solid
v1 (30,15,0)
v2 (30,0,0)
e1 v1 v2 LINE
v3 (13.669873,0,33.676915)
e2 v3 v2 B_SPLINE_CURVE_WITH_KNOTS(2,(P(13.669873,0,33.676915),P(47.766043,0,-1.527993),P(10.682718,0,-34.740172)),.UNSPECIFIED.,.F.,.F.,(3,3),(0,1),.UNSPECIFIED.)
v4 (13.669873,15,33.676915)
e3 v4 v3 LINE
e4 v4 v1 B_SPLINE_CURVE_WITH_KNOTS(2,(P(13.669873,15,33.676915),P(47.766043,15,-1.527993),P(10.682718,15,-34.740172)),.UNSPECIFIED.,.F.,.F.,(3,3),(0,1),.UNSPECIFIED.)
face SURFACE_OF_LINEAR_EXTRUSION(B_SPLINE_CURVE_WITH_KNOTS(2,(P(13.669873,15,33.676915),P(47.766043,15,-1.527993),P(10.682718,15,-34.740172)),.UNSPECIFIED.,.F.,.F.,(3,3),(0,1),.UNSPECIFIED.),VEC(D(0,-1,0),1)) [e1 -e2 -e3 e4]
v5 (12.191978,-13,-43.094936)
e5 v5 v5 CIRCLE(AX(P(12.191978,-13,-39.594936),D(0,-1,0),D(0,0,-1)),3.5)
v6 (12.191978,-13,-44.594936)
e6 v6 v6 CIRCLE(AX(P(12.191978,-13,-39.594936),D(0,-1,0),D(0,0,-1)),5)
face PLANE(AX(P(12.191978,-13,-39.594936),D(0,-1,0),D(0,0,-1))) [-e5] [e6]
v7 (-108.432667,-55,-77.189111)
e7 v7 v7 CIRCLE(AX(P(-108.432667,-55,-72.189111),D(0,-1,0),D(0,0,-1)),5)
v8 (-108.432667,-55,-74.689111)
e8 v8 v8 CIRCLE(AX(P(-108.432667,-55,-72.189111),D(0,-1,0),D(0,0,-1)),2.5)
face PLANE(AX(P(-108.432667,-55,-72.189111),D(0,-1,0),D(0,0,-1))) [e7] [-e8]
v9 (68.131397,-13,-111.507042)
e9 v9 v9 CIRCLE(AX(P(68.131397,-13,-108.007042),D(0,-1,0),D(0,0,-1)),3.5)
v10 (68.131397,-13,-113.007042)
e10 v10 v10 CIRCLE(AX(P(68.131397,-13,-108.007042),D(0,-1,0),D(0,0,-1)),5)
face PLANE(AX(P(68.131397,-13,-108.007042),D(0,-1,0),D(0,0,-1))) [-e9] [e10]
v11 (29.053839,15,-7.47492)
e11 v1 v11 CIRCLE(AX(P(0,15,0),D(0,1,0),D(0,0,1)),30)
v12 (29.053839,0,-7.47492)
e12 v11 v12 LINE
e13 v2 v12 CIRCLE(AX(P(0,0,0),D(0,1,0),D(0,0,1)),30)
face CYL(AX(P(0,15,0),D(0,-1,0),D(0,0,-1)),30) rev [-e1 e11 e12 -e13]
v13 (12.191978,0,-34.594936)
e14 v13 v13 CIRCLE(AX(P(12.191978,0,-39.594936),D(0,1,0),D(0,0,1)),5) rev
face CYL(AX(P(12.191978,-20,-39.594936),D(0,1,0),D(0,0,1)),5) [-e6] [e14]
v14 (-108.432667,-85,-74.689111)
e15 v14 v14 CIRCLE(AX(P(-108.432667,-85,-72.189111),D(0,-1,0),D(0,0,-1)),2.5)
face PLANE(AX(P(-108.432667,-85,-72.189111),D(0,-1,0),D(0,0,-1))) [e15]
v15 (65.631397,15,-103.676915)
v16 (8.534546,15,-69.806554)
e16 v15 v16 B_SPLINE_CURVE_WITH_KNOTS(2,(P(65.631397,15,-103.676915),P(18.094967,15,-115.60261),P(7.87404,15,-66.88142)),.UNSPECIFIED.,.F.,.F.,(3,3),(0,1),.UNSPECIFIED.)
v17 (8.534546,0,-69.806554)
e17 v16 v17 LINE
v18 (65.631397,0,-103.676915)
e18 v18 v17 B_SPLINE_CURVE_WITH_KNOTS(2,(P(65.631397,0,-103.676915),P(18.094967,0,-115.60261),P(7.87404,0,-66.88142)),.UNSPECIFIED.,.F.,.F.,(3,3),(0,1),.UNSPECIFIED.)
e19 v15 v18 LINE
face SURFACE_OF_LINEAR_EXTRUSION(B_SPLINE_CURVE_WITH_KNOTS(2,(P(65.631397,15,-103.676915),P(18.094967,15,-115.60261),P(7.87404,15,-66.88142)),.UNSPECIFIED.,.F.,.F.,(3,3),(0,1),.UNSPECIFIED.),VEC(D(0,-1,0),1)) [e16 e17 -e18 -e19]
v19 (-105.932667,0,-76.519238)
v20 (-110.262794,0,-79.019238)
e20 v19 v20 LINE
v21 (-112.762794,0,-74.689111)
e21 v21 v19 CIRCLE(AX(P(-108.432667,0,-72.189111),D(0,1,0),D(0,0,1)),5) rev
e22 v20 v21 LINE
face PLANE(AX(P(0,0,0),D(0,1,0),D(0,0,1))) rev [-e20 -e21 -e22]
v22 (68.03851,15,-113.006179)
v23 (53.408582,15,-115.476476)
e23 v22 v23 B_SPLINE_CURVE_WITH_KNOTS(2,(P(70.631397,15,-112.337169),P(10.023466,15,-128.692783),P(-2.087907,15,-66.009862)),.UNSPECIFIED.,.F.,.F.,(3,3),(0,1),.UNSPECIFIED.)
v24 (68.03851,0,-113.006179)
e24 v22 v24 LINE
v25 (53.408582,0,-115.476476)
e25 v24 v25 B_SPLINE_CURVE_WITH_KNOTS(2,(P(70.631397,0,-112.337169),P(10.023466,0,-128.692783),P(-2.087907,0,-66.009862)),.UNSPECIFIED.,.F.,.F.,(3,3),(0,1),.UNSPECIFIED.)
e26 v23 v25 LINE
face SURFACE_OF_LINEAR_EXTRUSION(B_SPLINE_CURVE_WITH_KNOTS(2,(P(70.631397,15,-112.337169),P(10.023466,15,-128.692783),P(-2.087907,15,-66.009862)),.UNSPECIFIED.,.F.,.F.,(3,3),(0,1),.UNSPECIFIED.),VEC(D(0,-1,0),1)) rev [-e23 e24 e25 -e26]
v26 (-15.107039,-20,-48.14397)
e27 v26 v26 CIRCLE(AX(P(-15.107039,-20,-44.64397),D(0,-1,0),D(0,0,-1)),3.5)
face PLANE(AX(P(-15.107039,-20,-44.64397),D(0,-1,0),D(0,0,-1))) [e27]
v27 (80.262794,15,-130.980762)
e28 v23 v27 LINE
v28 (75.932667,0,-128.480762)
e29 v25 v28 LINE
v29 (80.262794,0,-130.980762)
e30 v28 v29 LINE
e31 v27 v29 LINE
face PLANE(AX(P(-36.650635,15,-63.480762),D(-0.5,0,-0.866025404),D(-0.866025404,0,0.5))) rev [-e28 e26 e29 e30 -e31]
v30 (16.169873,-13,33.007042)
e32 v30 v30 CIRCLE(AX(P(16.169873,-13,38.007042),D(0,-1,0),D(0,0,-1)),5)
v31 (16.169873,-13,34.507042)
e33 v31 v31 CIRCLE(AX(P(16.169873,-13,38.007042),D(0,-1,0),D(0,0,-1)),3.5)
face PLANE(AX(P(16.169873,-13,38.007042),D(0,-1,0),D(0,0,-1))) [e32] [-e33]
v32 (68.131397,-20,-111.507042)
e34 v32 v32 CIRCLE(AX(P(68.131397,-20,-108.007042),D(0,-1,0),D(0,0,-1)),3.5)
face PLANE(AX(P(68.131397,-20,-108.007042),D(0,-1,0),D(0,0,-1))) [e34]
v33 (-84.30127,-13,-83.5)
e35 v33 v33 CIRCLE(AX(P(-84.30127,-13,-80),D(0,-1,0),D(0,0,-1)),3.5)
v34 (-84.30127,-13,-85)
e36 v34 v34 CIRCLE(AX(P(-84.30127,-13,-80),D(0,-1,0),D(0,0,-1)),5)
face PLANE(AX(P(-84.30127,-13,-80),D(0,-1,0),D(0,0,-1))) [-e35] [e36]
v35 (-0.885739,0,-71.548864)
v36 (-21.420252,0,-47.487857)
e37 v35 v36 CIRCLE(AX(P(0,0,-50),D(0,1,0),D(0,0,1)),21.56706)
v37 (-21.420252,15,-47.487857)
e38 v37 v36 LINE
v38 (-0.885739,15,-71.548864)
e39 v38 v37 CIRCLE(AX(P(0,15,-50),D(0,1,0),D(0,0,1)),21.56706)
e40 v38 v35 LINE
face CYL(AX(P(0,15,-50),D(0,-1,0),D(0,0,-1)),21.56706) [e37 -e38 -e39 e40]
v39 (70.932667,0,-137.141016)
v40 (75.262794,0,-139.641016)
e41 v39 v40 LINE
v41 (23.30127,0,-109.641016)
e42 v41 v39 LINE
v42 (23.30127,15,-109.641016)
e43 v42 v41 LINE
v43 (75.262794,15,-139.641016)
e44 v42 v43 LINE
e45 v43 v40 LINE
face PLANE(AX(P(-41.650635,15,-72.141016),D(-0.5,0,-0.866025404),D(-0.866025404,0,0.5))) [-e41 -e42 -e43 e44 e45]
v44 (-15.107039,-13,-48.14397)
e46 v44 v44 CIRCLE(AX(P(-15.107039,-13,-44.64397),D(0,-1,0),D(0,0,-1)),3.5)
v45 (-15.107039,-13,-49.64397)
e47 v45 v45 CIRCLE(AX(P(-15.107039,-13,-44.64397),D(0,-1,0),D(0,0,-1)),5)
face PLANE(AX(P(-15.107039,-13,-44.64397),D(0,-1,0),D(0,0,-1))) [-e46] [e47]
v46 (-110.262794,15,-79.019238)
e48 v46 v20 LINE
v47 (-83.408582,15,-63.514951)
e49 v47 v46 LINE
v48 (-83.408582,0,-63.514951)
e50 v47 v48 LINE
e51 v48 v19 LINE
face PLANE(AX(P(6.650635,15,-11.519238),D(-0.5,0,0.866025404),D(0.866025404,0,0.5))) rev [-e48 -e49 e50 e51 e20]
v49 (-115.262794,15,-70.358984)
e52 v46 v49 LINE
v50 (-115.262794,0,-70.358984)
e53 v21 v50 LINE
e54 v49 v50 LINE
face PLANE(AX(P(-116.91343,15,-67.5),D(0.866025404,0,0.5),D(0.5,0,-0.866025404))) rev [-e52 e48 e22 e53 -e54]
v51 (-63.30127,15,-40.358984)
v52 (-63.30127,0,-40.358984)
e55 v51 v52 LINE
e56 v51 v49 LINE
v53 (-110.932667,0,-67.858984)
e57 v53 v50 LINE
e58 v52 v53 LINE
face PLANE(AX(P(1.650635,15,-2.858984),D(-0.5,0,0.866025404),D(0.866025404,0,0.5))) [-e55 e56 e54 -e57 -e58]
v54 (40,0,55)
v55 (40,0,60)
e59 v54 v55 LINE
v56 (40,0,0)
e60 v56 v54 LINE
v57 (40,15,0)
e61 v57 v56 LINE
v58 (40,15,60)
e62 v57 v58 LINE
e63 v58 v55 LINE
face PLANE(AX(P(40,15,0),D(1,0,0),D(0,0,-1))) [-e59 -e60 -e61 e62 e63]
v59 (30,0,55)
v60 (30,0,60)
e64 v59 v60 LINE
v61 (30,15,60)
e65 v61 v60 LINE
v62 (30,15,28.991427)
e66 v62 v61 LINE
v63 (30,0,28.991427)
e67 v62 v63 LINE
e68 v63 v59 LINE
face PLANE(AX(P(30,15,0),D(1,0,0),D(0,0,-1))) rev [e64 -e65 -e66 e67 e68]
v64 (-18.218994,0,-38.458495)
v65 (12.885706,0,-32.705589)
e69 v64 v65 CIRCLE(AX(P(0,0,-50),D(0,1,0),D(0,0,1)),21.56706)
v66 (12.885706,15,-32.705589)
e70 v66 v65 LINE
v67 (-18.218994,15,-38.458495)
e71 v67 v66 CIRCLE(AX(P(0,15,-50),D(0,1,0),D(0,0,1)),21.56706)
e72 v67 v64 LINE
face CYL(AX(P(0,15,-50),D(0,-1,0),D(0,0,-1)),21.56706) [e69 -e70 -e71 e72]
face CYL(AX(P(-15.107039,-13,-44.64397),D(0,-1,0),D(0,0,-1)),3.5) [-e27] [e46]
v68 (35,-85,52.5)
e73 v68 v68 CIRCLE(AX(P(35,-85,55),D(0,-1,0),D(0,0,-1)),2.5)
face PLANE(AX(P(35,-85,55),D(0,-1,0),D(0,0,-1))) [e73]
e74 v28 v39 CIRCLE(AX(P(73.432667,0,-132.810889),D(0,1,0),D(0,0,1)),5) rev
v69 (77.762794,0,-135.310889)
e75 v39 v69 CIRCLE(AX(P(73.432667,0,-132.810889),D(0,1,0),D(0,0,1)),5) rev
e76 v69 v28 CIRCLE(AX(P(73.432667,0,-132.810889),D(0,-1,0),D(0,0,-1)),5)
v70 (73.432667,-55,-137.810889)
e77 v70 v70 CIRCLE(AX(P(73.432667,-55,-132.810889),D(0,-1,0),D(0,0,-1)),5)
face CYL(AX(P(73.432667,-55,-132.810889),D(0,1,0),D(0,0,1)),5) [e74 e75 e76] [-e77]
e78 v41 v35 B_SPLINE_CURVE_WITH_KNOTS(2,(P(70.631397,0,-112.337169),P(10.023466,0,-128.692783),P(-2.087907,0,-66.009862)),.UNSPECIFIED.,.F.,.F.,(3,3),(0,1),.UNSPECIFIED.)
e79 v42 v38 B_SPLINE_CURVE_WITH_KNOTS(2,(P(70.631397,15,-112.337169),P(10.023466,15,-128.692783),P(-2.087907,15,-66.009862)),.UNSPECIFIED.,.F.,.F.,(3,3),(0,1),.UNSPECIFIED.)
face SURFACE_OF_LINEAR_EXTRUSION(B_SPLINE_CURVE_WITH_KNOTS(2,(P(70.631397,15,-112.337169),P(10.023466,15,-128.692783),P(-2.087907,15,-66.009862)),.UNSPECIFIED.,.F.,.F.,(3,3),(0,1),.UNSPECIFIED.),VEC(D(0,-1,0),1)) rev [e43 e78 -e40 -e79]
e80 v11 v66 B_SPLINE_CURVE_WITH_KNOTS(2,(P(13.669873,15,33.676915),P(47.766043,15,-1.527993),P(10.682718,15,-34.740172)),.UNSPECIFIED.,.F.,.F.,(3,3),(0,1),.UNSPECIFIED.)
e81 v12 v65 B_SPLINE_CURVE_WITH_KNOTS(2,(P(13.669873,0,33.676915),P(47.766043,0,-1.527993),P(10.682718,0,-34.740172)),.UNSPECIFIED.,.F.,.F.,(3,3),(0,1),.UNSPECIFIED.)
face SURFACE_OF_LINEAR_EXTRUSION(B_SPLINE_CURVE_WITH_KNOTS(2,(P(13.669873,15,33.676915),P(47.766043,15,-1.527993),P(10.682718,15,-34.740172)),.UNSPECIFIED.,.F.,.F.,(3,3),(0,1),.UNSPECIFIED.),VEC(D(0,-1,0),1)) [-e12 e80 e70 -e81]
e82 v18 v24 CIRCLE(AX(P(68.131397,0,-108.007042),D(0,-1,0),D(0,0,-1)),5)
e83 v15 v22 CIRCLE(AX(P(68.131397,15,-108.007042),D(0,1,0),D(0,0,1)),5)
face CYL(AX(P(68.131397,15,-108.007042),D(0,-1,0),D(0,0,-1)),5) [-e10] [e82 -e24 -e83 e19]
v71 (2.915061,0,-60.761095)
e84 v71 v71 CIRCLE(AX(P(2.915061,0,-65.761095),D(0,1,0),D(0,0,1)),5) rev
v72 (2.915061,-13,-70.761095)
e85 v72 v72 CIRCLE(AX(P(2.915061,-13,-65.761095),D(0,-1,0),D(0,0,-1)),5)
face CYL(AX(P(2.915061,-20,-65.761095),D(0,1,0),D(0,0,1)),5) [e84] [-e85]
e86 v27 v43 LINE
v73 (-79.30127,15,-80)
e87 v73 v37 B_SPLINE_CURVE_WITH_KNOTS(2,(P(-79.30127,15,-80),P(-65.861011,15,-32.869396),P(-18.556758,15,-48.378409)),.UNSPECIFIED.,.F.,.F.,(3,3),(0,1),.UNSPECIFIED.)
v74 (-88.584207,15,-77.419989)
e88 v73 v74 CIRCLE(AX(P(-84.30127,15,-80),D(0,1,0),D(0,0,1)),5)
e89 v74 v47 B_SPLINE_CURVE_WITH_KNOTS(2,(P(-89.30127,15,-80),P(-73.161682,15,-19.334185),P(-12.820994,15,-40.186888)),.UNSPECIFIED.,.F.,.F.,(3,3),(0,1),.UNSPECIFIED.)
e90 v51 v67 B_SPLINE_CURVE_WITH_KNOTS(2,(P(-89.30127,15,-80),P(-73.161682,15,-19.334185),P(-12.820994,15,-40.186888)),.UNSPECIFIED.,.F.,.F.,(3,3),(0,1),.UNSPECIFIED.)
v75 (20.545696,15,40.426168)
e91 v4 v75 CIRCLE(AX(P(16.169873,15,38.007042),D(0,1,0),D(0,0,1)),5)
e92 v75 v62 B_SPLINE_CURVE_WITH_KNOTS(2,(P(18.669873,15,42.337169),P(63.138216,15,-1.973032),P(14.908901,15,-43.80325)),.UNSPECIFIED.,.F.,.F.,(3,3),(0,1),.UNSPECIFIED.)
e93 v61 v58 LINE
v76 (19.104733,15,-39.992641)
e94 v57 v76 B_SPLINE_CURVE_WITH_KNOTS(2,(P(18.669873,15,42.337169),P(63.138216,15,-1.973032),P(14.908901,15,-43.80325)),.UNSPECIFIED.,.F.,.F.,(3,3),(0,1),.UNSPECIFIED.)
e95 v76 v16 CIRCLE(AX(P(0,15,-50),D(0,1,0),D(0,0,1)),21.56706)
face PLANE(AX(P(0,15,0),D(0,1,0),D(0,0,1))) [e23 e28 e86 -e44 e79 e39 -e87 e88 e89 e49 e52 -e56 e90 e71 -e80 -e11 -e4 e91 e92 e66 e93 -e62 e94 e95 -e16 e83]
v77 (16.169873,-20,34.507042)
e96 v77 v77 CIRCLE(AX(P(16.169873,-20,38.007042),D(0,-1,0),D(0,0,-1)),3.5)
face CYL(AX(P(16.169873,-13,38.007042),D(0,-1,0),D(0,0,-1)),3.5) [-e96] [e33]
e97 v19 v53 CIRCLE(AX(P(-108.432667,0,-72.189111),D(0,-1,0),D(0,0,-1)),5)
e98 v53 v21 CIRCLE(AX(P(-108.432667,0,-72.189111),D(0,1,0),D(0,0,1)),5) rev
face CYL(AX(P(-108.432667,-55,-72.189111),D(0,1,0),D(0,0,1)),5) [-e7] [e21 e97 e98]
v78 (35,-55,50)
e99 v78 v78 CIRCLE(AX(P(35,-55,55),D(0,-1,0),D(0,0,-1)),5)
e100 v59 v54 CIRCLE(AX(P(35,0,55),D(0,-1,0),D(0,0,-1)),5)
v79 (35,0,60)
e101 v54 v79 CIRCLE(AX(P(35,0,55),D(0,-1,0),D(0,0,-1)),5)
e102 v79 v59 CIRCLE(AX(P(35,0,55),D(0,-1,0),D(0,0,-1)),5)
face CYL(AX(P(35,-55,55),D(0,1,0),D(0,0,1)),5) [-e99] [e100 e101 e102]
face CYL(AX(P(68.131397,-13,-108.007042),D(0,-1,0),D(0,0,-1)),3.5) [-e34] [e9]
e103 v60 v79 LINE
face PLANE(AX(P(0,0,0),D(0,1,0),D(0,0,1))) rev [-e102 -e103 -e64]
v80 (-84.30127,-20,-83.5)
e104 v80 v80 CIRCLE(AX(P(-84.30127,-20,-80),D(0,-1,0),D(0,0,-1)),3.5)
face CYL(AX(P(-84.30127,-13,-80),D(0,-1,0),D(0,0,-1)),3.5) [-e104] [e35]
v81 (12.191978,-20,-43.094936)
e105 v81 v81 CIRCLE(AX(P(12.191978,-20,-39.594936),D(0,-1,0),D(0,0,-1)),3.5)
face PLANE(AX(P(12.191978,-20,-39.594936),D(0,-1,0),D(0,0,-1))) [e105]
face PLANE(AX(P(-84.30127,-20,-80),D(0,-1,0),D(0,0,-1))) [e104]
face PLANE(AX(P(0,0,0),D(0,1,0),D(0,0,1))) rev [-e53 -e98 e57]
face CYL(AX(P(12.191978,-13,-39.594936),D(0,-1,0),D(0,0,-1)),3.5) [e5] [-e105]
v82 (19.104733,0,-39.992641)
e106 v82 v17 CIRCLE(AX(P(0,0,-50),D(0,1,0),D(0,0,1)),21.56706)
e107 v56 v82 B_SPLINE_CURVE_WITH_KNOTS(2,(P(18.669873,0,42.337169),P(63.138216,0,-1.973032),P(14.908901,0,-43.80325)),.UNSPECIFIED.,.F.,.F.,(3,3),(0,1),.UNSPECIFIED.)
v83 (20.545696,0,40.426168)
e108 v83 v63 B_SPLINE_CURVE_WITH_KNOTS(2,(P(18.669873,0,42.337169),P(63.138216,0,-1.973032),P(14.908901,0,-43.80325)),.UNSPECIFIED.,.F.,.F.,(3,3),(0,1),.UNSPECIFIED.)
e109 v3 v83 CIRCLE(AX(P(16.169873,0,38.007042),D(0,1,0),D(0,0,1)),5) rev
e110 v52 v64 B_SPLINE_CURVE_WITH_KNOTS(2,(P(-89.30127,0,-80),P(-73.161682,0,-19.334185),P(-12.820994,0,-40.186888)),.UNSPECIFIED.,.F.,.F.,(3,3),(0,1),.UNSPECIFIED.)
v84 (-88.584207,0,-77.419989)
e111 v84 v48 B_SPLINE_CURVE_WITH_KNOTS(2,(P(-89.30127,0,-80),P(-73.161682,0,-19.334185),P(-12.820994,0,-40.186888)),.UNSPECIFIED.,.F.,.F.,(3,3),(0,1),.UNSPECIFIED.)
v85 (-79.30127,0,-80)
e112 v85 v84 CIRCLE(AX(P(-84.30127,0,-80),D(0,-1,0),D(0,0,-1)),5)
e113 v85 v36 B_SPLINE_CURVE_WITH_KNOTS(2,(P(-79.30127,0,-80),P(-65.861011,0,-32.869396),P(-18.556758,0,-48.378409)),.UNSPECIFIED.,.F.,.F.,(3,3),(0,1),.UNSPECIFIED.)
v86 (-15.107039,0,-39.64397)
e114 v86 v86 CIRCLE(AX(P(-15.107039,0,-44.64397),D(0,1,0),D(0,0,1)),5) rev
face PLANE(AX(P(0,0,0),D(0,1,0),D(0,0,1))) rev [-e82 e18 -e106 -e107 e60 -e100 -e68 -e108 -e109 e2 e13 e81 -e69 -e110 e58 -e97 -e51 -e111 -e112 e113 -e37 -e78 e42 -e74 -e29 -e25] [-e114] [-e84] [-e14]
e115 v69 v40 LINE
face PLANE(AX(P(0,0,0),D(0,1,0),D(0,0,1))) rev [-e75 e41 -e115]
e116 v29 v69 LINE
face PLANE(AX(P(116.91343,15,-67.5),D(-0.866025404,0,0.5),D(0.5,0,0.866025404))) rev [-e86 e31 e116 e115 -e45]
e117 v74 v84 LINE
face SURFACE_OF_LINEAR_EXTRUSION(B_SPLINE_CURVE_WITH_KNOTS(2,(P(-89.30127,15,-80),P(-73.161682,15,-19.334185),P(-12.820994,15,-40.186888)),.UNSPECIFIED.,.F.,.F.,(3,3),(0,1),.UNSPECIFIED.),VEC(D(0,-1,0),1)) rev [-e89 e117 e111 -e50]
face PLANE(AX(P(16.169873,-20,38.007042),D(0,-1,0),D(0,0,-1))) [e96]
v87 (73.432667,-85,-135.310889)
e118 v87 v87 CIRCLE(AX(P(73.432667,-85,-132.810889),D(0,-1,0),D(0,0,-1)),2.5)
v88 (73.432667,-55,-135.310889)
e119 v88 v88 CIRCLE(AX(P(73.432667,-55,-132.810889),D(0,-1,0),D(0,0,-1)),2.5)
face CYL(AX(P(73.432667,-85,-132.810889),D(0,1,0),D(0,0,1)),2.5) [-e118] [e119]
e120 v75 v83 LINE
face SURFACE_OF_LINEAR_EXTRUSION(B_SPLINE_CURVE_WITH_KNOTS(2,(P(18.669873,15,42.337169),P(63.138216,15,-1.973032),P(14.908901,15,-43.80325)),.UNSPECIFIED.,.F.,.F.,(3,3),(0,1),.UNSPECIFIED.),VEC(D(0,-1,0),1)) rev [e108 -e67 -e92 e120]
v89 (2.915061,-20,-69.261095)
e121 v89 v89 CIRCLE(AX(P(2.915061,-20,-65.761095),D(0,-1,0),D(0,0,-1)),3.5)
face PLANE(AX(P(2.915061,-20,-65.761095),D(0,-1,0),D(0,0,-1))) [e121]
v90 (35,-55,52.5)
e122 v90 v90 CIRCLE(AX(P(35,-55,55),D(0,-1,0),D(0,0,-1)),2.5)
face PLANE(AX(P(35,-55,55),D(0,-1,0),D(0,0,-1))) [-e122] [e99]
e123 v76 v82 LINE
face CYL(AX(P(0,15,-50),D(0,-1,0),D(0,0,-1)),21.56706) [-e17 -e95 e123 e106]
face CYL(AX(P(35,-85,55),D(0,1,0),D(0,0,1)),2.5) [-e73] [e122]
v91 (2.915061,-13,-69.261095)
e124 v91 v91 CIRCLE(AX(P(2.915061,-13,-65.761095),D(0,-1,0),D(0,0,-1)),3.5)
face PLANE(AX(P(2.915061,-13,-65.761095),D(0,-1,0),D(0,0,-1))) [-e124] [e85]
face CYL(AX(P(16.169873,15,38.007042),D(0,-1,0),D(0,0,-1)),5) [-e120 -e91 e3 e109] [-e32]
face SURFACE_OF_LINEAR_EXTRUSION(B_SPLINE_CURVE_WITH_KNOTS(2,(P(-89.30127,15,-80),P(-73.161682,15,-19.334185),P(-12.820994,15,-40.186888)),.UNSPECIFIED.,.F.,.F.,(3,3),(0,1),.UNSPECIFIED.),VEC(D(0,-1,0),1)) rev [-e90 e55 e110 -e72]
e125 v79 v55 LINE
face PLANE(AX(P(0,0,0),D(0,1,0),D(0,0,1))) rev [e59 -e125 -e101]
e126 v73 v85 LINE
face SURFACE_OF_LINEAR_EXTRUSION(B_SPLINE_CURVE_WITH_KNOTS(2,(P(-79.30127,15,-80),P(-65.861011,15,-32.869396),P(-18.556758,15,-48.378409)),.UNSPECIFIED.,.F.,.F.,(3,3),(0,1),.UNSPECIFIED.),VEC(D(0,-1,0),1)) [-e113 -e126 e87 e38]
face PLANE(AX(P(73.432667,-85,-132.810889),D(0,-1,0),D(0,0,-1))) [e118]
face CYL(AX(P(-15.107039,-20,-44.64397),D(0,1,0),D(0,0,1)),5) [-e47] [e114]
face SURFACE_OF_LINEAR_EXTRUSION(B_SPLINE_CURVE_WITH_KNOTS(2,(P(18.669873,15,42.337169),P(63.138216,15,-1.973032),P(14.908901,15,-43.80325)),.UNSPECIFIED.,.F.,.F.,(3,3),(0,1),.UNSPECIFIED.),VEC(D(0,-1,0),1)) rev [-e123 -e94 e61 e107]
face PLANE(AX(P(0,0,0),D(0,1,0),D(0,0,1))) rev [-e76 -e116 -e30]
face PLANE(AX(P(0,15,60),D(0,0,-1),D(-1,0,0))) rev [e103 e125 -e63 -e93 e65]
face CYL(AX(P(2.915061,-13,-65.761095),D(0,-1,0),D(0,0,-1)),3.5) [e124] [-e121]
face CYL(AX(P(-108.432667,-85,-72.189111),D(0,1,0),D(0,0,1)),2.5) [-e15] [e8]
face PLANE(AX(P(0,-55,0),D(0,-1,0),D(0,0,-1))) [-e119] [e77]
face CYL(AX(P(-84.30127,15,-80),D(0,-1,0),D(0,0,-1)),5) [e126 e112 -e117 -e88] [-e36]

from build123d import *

# Parameters (mm, degrees)
BOSS_EXTRUDE2_DEPTH = 15
SKETCH4_R           = 5
BOSS_EXTRUDE3_DEPTH = 55
SKETCH5_R           = 2.5
BOSS_EXTRUDE5_DEPTH = 30
BOSS_EXTRUDE6_START = 20
SKETCH6_R           = 5
BOSS_EXTRUDE6_DEPTH = 20
SKETCH9_R           = 5
BOSS_EXTRUDE7_DEPTH = 20
SKETCH10_R          = 5
SKETCH10_R_2        = 3.5
CUT_EXTRUDE1_DEPTH  = 7


# Read off the part's stored shape, not the designer's step: Boss-Extrude2
with BuildPart() as part:
    # Boss-Extrude2 outline → Boss-Extrude2 (new body)
    with BuildSketch(Plane(origin=(0, 0, 0), x_dir=(1, 0, 0), z_dir=(0, 1, 0))):
        with BuildLine():
            ThreePointArc((-79.301270189, 80.000000278), (-85.640172505, 84.817399775), (-88.584206568, 77.419989152))
            add(Edge.make_bspline(
                [(-88.584206568, 77.419989152), (-86.367928891, 69.782262616), (-83.408582461, 63.514951385)],
                knots=[0.02157692, 0.02157692, 0.02157692, 0.151234515, 0.151234515, 0.151234515], degree=2))
            Line((-83.408582461, 63.514951385), (-110.262794416, 79.019237886))
            Line((-110.262794416, 79.019237886), (-115.262794416, 70.358983849))
            Line((-115.262794416, 70.358983849), (-63.301270189, 40.358983849))
            add(Edge.make_bspline(
                [(-63.301270189, 40.358983849), (-45.646570728, 30.396854404), (-18.218994006, 38.458495307)],
                knots=[0.484299762, 0.484299762, 0.484299762, 0.954512817, 0.954512817, 0.954512817], degree=2))
            ThreePointArc((-18.218994006, 38.458495307), (-3.922368216, 28.792616834), (12.885706155, 32.705589052))
            add(Edge.make_bspline(
                [(29.05383915, 7.474920109), (25.9728438, 20.230319759), (12.885706155, 32.705589052)],
                knots=[0.594463111, 0.594463111, 0.594463111, 0.969398026, 0.969398026, 0.969398026], degree=2))
            ThreePointArc((29.05383915, 7.474920109), (29.76251984, 3.767281878), (30, 0))
            add(Edge.make_bspline(
                [(13.669872981, -33.676914536), (30.204968933, -16.604131181), (30, 0)],
                knots=[0, 0, 0, 0.484954637, 0.484954637, 0.484954637], degree=2))
            ThreePointArc((13.669872981, -33.676914536), (12.667333455, -41.575264764), (20.545696107, -40.426167838))
            add(Edge.make_bspline(
                [(20.545696107, -40.426167838), (26.052022476, -34.6879518), (30, -28.991426998)],
                knots=[0.02157692, 0.02157692, 0.02157692, 0.151234515, 0.151234515, 0.151234515], degree=2))
            Line((30, -28.991426998), (30, -60))
            Line((30, -60), (40, -60))
            Line((40, -60), (40, 0))
            add(Edge.make_bspline(
                [(40, 0), (39.800107444, 20.270482952), (19.104733265, 39.992640706)],
                knots=[0.484299762, 0.484299762, 0.484299762, 0.954512817, 0.954512817, 0.954512817], degree=2))
            ThreePointArc((19.104733265, 39.992640706), (20.327316677, 57.206821065), (8.534546147, 69.80655435))
            add(Edge.make_bspline(
                [(65.631397208, 103.676914536), (19.549675952, 115.237660492), (8.534546147, 69.80655435)],
                knots=[0, 0, 0, 0.969398026, 0.969398026, 0.969398026], degree=2))
            ThreePointArc((65.631397208, 103.676914536), (72.972838916, 106.757864952), (68.038510461, 113.006178686))
            add(Edge.make_bspline(
                [(68.038510461, 113.006178686), (60.315906416, 114.905689184), (53.408582461, 115.476475612)],
                knots=[0.02157692, 0.02157692, 0.02157692, 0.151234515, 0.151234515, 0.151234515], degree=2))
            Line((53.408582461, 115.476475612), (80.262794416, 130.980762114))
            Line((80.262794416, 130.980762114), (75.262794416, 139.641016151))
            Line((75.262794416, 139.641016151), (23.301270189, 109.641016151))
            add(Edge.make_bspline(
                [(23.301270189, 109.641016151), (5.846463284, 99.332662644), (-0.885739259, 71.548863987)],
                knots=[0.484299762, 0.484299762, 0.484299762, 0.954512817, 0.954512817, 0.954512817], degree=2))
            ThreePointArc((-0.885739259, 71.548863987), (-16.404948461, 64.000562101), (-21.420252302, 47.487856599))
            add(Edge.make_bspline(
                [(-79.301270189, 80.000000278), (-66.272309422, 34.311685724), (-21.420252302, 47.487856599)],
                knots=[0, 0, 0, 0.969398026, 0.969398026, 0.969398026], degree=2))
        make_face()
    extrude(amount=BOSS_EXTRUDE2_DEPTH)

    # Sketch4 → Boss-Extrude3 (add)
    with BuildSketch(Plane.XZ):
        with Locations(Location((-108.432667397, -72.189110868, 0), (0, 0, 120))):
            Circle(SKETCH4_R)
        with Locations(Location((35, 55, 0), (0, 0, 90))):
            Circle(SKETCH4_R)
        with Locations(Location((73.432667397, -132.810889132, 0), (0, 0, 60))):
            Circle(SKETCH4_R)
    extrude(amount=BOSS_EXTRUDE3_DEPTH)

    # Sketch5 → Boss-Extrude5 (add)
    with BuildSketch(Plane.XZ.offset(55)):
        with Locations(Location((35, 55, 0), (0, 0, 270))):
            Circle(SKETCH5_R)
        with Locations(Location((73.432667397, -132.810889132, 0), (0, 0, 270))):
            Circle(SKETCH5_R)
        with Locations(Location((-108.432667397, -72.189110868, 0), (0, 0, 270))):
            Circle(SKETCH5_R)
    extrude(amount=BOSS_EXTRUDE5_DEPTH)

    # Sketch6 → Boss-Extrude6 (add)
    with BuildSketch(Plane.XZ.offset(BOSS_EXTRUDE6_START)):
        with Locations(Location((16.169872981, 38.007041555, 0), (0, 0, 270))):
            Circle(SKETCH6_R)
        with Locations(Location((-84.301270189, -80, 0), (0, 0, 270))):
            Circle(SKETCH6_R)
        with Locations(Location((68.131397208, -108.007041555, 0), (0, 0, 270))):
            Circle(SKETCH6_R)
    extrude(amount=-BOSS_EXTRUDE6_DEPTH)

    # Sketch9 → Boss-Extrude7 (add)
    with BuildSketch(Plane.XZ):
        with Locations(Location((-15.107039064, -44.643969537, 0), (0, 0, 90))):
            Circle(SKETCH9_R)
        with Locations(Location((12.191977977, -39.594935626, 0), (0, 0, 90))):
            Circle(SKETCH9_R)
        with Locations(Location((2.915061087, -65.761094837, 0), (0, 0, 90))):
            Circle(SKETCH9_R)
    extrude(amount=BOSS_EXTRUDE7_DEPTH)

    # Sketch10 → Cut-Extrude1 (cut)
    # profile 1 of 6: a face of its own
    with BuildSketch(Plane(origin=(0, -20, 0), x_dir=(-1, 0, 0), z_dir=(0, -1, 0))):
        with Locations(Location((-16.169872981, -38.007041555, 0), (0, 0, 90))):
            Circle(SKETCH10_R)
        with Locations(Location((-16.169872981, -38.007041555, 0), (0, 0, 90))):
            Circle(SKETCH10_R_2, mode=Mode.SUBTRACT)
    # profile 2 of 6: a face of its own
    with BuildSketch(Plane(origin=(0, -20, 0), x_dir=(-1, 0, 0), z_dir=(0, -1, 0))):
        with Locations(Location((-68.131397208, 108.007041555, 0), (0, 0, 90))):
            Circle(SKETCH10_R)
        with Locations(Location((-68.131397208, 108.007041555, 0), (0, 0, 90))):
            Circle(SKETCH10_R_2, mode=Mode.SUBTRACT)
    # profile 3 of 6: a face of its own
    with BuildSketch(Plane(origin=(0, -20, 0), x_dir=(-1, 0, 0), z_dir=(0, -1, 0))):
        with Locations(Location((-12.191977977, 39.594935626, 0), (0, 0, 270))):
            Circle(SKETCH10_R)
        with Locations(Location((-12.191977977, 39.594935626, 0), (0, 0, 90))):
            Circle(SKETCH10_R_2, mode=Mode.SUBTRACT)
    # profile 4 of 6: a face of its own
    with BuildSketch(Plane(origin=(0, -20, 0), x_dir=(-1, 0, 0), z_dir=(0, -1, 0))):
        with Locations(Location((-2.915061087, 65.761094837, 0), (0, 0, 270))):
            Circle(SKETCH10_R)
        with Locations(Location((-2.915061087, 65.761094837, 0), (0, 0, 90))):
            Circle(SKETCH10_R_2, mode=Mode.SUBTRACT)
    # profile 5 of 6: a face of its own
    with BuildSketch(Plane(origin=(0, -20, 0), x_dir=(-1, 0, 0), z_dir=(0, -1, 0))):
        with Locations(Location((15.107039064, 44.643969537, 0), (0, 0, 270))):
            Circle(SKETCH10_R)
        with Locations(Location((15.107039064, 44.643969537, 0), (0, 0, 90))):
            Circle(SKETCH10_R_2, mode=Mode.SUBTRACT)
    # profile 6 of 6: a face of its own
    with BuildSketch(Plane(origin=(0, -20, 0), x_dir=(-1, 0, 0), z_dir=(0, -1, 0))):
        with Locations(Location((84.301270189, 80, 0), (0, 0, 90))):
            Circle(SKETCH10_R)
        with Locations(Location((84.301270189, 80, 0), (0, 0, 90))):
            Circle(SKETCH10_R_2, mode=Mode.SUBTRACT)
    extrude(amount=-CUT_EXTRUDE1_DEPTH, mode=Mode.SUBTRACT)


solid = part.part
